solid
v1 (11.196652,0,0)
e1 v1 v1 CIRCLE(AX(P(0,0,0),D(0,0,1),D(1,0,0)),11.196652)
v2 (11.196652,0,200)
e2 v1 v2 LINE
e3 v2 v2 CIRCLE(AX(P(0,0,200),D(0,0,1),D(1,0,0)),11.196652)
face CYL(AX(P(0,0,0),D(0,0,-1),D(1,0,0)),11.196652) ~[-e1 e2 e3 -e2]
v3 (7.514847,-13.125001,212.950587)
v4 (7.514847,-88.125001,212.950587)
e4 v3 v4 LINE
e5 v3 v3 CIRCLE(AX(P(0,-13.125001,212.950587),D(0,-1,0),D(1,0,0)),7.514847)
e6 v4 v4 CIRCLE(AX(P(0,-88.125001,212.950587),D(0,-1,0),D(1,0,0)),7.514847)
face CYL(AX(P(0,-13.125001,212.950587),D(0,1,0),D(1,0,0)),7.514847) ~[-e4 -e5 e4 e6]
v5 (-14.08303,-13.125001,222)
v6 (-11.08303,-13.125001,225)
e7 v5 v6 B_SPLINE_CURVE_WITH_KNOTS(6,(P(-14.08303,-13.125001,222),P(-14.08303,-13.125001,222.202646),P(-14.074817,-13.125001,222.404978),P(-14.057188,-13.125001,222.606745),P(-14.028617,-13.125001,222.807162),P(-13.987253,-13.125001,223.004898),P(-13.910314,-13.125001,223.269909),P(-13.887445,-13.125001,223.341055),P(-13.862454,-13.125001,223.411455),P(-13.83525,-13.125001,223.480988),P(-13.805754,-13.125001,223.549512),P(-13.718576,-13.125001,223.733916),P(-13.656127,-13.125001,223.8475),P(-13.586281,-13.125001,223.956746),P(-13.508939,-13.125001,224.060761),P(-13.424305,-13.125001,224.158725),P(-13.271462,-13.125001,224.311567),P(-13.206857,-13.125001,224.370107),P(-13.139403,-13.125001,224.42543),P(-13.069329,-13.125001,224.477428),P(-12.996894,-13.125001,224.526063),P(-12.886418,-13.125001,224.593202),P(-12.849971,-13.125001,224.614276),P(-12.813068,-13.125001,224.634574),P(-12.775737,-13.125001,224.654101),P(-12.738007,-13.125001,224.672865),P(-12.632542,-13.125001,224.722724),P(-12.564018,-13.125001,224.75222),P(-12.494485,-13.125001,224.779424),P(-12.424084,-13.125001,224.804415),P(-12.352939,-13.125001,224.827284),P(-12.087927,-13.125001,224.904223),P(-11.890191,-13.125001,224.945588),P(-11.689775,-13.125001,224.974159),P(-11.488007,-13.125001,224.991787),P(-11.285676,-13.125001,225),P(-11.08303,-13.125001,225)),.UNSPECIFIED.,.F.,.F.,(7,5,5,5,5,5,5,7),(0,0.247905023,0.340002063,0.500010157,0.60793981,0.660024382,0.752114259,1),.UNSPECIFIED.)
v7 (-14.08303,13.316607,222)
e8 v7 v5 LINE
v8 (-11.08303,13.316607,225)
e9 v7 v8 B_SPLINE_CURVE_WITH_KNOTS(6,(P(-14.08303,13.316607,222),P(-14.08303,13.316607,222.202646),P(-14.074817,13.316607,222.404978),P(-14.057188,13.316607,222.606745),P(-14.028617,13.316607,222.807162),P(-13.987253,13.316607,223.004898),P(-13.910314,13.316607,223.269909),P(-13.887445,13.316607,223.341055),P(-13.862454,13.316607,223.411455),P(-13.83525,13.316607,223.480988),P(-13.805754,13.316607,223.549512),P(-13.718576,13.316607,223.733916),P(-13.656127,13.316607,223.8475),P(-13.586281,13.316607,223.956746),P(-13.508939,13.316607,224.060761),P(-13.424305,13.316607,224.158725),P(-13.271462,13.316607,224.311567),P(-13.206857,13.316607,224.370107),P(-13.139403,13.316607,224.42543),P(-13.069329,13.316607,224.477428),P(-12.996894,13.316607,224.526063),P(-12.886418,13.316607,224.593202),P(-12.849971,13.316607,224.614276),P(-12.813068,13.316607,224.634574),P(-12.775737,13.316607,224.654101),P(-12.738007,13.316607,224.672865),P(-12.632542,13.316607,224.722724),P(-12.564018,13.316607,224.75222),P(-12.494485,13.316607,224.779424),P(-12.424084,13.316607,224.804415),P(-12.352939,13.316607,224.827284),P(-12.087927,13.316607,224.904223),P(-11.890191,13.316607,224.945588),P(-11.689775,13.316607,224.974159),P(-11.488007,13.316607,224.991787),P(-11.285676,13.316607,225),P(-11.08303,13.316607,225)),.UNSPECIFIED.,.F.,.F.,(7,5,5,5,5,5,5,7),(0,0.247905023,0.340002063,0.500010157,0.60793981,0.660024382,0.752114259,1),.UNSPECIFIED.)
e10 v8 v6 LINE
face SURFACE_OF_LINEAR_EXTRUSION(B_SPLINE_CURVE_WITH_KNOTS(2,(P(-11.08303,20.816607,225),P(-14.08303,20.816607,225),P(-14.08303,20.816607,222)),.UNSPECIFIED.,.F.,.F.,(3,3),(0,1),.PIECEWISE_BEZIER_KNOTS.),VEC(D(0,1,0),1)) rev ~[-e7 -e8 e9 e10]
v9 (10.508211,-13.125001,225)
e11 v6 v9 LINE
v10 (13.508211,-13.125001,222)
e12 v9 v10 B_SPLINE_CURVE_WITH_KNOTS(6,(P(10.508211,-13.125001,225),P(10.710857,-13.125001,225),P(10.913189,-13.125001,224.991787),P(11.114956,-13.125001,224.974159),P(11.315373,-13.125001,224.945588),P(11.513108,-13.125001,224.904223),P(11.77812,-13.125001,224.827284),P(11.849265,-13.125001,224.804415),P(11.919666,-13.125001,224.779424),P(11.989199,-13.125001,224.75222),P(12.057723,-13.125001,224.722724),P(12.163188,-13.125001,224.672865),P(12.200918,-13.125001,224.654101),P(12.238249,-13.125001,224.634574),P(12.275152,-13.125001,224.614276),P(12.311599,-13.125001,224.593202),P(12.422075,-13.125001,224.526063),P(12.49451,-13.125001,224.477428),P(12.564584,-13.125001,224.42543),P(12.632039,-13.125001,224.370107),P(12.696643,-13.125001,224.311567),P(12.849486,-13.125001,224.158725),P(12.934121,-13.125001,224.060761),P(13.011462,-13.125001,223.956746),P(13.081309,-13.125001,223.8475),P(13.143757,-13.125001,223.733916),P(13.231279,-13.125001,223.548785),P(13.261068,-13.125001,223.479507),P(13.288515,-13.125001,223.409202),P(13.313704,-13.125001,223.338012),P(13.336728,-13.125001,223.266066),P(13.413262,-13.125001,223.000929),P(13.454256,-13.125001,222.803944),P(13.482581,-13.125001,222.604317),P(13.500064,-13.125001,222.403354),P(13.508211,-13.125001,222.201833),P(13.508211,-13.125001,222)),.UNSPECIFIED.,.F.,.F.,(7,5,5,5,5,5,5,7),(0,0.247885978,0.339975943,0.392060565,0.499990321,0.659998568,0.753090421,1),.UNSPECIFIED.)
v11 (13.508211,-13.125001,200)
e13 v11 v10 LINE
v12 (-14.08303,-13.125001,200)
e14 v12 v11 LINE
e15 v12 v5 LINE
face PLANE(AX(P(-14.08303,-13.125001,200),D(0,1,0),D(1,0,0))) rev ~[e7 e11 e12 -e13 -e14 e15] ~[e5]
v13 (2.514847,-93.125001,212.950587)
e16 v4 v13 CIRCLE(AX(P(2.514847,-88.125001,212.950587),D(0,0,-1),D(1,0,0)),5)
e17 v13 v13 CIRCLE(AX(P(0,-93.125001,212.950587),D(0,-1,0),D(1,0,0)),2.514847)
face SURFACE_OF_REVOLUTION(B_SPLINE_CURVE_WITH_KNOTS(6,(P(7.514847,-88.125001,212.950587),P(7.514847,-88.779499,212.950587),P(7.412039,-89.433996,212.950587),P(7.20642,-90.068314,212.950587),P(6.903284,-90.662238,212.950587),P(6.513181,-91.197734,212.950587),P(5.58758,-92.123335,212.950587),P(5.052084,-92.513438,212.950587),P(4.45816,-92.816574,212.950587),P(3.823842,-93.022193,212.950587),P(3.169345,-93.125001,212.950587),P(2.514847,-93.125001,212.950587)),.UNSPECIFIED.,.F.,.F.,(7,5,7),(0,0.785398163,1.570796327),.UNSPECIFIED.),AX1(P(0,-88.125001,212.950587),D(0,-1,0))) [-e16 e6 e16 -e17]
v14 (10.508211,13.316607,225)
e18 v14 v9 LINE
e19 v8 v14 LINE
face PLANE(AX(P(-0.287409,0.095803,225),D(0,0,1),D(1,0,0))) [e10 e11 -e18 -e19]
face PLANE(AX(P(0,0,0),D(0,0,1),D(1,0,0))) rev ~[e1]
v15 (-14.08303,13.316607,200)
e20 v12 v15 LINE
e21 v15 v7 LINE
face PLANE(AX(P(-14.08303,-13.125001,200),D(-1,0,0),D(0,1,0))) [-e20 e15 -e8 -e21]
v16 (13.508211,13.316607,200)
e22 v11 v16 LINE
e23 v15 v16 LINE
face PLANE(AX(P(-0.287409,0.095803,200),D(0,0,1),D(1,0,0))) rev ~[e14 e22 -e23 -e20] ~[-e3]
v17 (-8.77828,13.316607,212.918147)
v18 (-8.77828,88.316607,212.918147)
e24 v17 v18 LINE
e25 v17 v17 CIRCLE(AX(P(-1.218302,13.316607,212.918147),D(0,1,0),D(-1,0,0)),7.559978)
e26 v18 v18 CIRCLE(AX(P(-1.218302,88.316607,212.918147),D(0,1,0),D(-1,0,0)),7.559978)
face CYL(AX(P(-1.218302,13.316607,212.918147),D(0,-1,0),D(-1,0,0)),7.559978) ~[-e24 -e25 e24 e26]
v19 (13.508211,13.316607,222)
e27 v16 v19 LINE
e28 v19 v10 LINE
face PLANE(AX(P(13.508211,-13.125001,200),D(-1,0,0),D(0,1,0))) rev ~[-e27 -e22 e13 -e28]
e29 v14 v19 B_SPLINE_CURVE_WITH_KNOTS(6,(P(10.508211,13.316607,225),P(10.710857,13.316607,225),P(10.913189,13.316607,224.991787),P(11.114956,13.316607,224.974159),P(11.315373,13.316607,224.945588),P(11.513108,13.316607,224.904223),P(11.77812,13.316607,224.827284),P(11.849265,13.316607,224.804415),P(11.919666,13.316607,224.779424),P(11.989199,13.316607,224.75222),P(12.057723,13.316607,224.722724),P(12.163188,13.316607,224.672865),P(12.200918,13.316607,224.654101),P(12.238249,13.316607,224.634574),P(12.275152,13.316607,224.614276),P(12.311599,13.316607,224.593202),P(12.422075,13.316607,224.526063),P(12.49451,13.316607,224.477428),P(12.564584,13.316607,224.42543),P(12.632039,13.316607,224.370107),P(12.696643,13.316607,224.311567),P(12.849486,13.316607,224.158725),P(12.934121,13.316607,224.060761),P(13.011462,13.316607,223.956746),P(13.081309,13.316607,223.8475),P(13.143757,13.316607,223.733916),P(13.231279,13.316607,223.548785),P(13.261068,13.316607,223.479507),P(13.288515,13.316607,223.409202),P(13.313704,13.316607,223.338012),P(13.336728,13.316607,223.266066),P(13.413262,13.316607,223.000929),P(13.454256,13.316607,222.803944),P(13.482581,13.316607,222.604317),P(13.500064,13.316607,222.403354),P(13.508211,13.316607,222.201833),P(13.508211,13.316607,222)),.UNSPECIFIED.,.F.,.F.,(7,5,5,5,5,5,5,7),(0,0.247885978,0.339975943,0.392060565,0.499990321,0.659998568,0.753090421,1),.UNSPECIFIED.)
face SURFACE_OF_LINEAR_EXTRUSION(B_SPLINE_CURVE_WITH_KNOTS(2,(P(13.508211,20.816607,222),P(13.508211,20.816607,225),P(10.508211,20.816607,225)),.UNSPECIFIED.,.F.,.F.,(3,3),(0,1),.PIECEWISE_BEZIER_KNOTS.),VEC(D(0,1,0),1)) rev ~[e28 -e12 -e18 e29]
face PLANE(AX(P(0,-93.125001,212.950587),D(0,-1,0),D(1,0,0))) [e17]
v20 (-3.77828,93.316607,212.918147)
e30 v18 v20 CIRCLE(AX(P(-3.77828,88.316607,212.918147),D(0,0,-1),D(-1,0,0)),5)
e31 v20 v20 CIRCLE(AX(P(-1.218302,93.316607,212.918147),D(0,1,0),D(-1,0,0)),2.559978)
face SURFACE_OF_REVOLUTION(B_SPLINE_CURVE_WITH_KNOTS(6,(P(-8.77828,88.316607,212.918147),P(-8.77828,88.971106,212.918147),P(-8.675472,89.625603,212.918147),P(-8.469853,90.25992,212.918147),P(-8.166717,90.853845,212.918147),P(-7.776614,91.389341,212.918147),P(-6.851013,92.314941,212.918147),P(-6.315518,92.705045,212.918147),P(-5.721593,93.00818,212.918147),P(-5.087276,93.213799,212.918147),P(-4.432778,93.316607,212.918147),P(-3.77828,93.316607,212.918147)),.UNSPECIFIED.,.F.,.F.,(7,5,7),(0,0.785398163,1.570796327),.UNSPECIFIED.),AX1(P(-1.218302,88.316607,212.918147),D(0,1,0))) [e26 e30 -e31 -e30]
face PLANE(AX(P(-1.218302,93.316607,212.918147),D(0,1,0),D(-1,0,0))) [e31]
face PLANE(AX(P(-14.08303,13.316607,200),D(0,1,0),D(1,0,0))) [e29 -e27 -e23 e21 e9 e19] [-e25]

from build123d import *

# Parameters (mm, degrees)
F0_R        = 11.1966523668
F1_DEPTH    = 200
F2_W        = 27.5912405923
F2_H        = 26.4416076243
F3_DEPTH    = 25
F5_R        = 7.5599777125
F6_DEPTH    = 80
F4_R        = 7.5148466093
F7_DEPTH    = 80
F8_T1_DEPTH = 41.4416076243
F9_R        = 5
F10_R       = 5


# Not quite as in the source:
# - a fillet or chamfer that OpenCascade refuses, or shapes differently, is made with other operations: its cross-section is extruded or revolved along the edge and cut away or added
# - a feature names something its author has since deleted; it is built from what else it names


with BuildPart() as f1:
    # F0 (on Top) → F1 (new body)
    with BuildSketch(Plane.XY):
        Circle(F0_R)
    extrude(amount=F1_DEPTH)

    # F2 (on face) → F3 (join)
    with BuildSketch(Plane.XY.offset(200)):
        with Locations((-0.2874094062, 0.0958032906)):
            Rectangle(F2_W, F2_H)
    extrude(amount=F3_DEPTH)

    # F5 (on face) → F6 (join)
    with BuildSketch(Plane(origin=(0, 13.3166071028, 0), x_dir=(-1, 0, 0), z_dir=(0, 1, 0))):
        with Locations((1.2183021754, 212.9181474447)):
            Circle(F5_R)
    extrude(amount=F6_DEPTH)

    # F4 (on face) → F7 (join)
    with BuildSketch(Plane.XZ.offset(13.1250005215)):
        with Locations((0, 212.9505872726)):
            Circle(F4_R)
    extrude(amount=F7_DEPTH)

    # F8: fillet of radius 3 on 2 edges, made by hand

    # F8_s2 → F8_t1 (cut)
    with BuildSketch(Plane.XZ.offset(-20.8166071028)):
        with BuildLine():
            add(Edge.make_bspline(
                [(13.50821089, 222), (13.50821089, 225), (10.50821089, 225)],
                knots=[0, 0, 0, 1, 1, 1], degree=2, weights=[1, 1, 1]))
            Line((10.50821089, 225), (13.50821089, 225))
            Line((13.50821089, 225), (13.50821089, 222))
        make_face()
        with BuildLine():
            add(Edge.make_bspline(
                [(-11.0830297023, 225), (-14.0830297023, 225), (-14.0830297023, 222)],
                knots=[0, 0, 0, 1, 1, 1], degree=2, weights=[1, 1, 1]))
            Line((-14.0830297023, 222), (-14.0830297023, 225))
            Line((-14.0830297023, 225), (-11.0830297023, 225))
        make_face()
    extrude(amount=F8_T1_DEPTH, mode=Mode.SUBTRACT)

    # F9
    f9_edges = [f1.edges().sort_by_distance(p)[0] for p in [
        (6.341676, 93.316607, 212.918147),
    ]]
    fillet(f9_edges, radius=F9_R)

    # F10
    f10_edges = [f1.edges().sort_by_distance(p)[0] for p in [
        (-7.514847, -93.125001, 212.950587),
    ]]
    fillet(f10_edges, radius=F10_R)


solid = f1.part
